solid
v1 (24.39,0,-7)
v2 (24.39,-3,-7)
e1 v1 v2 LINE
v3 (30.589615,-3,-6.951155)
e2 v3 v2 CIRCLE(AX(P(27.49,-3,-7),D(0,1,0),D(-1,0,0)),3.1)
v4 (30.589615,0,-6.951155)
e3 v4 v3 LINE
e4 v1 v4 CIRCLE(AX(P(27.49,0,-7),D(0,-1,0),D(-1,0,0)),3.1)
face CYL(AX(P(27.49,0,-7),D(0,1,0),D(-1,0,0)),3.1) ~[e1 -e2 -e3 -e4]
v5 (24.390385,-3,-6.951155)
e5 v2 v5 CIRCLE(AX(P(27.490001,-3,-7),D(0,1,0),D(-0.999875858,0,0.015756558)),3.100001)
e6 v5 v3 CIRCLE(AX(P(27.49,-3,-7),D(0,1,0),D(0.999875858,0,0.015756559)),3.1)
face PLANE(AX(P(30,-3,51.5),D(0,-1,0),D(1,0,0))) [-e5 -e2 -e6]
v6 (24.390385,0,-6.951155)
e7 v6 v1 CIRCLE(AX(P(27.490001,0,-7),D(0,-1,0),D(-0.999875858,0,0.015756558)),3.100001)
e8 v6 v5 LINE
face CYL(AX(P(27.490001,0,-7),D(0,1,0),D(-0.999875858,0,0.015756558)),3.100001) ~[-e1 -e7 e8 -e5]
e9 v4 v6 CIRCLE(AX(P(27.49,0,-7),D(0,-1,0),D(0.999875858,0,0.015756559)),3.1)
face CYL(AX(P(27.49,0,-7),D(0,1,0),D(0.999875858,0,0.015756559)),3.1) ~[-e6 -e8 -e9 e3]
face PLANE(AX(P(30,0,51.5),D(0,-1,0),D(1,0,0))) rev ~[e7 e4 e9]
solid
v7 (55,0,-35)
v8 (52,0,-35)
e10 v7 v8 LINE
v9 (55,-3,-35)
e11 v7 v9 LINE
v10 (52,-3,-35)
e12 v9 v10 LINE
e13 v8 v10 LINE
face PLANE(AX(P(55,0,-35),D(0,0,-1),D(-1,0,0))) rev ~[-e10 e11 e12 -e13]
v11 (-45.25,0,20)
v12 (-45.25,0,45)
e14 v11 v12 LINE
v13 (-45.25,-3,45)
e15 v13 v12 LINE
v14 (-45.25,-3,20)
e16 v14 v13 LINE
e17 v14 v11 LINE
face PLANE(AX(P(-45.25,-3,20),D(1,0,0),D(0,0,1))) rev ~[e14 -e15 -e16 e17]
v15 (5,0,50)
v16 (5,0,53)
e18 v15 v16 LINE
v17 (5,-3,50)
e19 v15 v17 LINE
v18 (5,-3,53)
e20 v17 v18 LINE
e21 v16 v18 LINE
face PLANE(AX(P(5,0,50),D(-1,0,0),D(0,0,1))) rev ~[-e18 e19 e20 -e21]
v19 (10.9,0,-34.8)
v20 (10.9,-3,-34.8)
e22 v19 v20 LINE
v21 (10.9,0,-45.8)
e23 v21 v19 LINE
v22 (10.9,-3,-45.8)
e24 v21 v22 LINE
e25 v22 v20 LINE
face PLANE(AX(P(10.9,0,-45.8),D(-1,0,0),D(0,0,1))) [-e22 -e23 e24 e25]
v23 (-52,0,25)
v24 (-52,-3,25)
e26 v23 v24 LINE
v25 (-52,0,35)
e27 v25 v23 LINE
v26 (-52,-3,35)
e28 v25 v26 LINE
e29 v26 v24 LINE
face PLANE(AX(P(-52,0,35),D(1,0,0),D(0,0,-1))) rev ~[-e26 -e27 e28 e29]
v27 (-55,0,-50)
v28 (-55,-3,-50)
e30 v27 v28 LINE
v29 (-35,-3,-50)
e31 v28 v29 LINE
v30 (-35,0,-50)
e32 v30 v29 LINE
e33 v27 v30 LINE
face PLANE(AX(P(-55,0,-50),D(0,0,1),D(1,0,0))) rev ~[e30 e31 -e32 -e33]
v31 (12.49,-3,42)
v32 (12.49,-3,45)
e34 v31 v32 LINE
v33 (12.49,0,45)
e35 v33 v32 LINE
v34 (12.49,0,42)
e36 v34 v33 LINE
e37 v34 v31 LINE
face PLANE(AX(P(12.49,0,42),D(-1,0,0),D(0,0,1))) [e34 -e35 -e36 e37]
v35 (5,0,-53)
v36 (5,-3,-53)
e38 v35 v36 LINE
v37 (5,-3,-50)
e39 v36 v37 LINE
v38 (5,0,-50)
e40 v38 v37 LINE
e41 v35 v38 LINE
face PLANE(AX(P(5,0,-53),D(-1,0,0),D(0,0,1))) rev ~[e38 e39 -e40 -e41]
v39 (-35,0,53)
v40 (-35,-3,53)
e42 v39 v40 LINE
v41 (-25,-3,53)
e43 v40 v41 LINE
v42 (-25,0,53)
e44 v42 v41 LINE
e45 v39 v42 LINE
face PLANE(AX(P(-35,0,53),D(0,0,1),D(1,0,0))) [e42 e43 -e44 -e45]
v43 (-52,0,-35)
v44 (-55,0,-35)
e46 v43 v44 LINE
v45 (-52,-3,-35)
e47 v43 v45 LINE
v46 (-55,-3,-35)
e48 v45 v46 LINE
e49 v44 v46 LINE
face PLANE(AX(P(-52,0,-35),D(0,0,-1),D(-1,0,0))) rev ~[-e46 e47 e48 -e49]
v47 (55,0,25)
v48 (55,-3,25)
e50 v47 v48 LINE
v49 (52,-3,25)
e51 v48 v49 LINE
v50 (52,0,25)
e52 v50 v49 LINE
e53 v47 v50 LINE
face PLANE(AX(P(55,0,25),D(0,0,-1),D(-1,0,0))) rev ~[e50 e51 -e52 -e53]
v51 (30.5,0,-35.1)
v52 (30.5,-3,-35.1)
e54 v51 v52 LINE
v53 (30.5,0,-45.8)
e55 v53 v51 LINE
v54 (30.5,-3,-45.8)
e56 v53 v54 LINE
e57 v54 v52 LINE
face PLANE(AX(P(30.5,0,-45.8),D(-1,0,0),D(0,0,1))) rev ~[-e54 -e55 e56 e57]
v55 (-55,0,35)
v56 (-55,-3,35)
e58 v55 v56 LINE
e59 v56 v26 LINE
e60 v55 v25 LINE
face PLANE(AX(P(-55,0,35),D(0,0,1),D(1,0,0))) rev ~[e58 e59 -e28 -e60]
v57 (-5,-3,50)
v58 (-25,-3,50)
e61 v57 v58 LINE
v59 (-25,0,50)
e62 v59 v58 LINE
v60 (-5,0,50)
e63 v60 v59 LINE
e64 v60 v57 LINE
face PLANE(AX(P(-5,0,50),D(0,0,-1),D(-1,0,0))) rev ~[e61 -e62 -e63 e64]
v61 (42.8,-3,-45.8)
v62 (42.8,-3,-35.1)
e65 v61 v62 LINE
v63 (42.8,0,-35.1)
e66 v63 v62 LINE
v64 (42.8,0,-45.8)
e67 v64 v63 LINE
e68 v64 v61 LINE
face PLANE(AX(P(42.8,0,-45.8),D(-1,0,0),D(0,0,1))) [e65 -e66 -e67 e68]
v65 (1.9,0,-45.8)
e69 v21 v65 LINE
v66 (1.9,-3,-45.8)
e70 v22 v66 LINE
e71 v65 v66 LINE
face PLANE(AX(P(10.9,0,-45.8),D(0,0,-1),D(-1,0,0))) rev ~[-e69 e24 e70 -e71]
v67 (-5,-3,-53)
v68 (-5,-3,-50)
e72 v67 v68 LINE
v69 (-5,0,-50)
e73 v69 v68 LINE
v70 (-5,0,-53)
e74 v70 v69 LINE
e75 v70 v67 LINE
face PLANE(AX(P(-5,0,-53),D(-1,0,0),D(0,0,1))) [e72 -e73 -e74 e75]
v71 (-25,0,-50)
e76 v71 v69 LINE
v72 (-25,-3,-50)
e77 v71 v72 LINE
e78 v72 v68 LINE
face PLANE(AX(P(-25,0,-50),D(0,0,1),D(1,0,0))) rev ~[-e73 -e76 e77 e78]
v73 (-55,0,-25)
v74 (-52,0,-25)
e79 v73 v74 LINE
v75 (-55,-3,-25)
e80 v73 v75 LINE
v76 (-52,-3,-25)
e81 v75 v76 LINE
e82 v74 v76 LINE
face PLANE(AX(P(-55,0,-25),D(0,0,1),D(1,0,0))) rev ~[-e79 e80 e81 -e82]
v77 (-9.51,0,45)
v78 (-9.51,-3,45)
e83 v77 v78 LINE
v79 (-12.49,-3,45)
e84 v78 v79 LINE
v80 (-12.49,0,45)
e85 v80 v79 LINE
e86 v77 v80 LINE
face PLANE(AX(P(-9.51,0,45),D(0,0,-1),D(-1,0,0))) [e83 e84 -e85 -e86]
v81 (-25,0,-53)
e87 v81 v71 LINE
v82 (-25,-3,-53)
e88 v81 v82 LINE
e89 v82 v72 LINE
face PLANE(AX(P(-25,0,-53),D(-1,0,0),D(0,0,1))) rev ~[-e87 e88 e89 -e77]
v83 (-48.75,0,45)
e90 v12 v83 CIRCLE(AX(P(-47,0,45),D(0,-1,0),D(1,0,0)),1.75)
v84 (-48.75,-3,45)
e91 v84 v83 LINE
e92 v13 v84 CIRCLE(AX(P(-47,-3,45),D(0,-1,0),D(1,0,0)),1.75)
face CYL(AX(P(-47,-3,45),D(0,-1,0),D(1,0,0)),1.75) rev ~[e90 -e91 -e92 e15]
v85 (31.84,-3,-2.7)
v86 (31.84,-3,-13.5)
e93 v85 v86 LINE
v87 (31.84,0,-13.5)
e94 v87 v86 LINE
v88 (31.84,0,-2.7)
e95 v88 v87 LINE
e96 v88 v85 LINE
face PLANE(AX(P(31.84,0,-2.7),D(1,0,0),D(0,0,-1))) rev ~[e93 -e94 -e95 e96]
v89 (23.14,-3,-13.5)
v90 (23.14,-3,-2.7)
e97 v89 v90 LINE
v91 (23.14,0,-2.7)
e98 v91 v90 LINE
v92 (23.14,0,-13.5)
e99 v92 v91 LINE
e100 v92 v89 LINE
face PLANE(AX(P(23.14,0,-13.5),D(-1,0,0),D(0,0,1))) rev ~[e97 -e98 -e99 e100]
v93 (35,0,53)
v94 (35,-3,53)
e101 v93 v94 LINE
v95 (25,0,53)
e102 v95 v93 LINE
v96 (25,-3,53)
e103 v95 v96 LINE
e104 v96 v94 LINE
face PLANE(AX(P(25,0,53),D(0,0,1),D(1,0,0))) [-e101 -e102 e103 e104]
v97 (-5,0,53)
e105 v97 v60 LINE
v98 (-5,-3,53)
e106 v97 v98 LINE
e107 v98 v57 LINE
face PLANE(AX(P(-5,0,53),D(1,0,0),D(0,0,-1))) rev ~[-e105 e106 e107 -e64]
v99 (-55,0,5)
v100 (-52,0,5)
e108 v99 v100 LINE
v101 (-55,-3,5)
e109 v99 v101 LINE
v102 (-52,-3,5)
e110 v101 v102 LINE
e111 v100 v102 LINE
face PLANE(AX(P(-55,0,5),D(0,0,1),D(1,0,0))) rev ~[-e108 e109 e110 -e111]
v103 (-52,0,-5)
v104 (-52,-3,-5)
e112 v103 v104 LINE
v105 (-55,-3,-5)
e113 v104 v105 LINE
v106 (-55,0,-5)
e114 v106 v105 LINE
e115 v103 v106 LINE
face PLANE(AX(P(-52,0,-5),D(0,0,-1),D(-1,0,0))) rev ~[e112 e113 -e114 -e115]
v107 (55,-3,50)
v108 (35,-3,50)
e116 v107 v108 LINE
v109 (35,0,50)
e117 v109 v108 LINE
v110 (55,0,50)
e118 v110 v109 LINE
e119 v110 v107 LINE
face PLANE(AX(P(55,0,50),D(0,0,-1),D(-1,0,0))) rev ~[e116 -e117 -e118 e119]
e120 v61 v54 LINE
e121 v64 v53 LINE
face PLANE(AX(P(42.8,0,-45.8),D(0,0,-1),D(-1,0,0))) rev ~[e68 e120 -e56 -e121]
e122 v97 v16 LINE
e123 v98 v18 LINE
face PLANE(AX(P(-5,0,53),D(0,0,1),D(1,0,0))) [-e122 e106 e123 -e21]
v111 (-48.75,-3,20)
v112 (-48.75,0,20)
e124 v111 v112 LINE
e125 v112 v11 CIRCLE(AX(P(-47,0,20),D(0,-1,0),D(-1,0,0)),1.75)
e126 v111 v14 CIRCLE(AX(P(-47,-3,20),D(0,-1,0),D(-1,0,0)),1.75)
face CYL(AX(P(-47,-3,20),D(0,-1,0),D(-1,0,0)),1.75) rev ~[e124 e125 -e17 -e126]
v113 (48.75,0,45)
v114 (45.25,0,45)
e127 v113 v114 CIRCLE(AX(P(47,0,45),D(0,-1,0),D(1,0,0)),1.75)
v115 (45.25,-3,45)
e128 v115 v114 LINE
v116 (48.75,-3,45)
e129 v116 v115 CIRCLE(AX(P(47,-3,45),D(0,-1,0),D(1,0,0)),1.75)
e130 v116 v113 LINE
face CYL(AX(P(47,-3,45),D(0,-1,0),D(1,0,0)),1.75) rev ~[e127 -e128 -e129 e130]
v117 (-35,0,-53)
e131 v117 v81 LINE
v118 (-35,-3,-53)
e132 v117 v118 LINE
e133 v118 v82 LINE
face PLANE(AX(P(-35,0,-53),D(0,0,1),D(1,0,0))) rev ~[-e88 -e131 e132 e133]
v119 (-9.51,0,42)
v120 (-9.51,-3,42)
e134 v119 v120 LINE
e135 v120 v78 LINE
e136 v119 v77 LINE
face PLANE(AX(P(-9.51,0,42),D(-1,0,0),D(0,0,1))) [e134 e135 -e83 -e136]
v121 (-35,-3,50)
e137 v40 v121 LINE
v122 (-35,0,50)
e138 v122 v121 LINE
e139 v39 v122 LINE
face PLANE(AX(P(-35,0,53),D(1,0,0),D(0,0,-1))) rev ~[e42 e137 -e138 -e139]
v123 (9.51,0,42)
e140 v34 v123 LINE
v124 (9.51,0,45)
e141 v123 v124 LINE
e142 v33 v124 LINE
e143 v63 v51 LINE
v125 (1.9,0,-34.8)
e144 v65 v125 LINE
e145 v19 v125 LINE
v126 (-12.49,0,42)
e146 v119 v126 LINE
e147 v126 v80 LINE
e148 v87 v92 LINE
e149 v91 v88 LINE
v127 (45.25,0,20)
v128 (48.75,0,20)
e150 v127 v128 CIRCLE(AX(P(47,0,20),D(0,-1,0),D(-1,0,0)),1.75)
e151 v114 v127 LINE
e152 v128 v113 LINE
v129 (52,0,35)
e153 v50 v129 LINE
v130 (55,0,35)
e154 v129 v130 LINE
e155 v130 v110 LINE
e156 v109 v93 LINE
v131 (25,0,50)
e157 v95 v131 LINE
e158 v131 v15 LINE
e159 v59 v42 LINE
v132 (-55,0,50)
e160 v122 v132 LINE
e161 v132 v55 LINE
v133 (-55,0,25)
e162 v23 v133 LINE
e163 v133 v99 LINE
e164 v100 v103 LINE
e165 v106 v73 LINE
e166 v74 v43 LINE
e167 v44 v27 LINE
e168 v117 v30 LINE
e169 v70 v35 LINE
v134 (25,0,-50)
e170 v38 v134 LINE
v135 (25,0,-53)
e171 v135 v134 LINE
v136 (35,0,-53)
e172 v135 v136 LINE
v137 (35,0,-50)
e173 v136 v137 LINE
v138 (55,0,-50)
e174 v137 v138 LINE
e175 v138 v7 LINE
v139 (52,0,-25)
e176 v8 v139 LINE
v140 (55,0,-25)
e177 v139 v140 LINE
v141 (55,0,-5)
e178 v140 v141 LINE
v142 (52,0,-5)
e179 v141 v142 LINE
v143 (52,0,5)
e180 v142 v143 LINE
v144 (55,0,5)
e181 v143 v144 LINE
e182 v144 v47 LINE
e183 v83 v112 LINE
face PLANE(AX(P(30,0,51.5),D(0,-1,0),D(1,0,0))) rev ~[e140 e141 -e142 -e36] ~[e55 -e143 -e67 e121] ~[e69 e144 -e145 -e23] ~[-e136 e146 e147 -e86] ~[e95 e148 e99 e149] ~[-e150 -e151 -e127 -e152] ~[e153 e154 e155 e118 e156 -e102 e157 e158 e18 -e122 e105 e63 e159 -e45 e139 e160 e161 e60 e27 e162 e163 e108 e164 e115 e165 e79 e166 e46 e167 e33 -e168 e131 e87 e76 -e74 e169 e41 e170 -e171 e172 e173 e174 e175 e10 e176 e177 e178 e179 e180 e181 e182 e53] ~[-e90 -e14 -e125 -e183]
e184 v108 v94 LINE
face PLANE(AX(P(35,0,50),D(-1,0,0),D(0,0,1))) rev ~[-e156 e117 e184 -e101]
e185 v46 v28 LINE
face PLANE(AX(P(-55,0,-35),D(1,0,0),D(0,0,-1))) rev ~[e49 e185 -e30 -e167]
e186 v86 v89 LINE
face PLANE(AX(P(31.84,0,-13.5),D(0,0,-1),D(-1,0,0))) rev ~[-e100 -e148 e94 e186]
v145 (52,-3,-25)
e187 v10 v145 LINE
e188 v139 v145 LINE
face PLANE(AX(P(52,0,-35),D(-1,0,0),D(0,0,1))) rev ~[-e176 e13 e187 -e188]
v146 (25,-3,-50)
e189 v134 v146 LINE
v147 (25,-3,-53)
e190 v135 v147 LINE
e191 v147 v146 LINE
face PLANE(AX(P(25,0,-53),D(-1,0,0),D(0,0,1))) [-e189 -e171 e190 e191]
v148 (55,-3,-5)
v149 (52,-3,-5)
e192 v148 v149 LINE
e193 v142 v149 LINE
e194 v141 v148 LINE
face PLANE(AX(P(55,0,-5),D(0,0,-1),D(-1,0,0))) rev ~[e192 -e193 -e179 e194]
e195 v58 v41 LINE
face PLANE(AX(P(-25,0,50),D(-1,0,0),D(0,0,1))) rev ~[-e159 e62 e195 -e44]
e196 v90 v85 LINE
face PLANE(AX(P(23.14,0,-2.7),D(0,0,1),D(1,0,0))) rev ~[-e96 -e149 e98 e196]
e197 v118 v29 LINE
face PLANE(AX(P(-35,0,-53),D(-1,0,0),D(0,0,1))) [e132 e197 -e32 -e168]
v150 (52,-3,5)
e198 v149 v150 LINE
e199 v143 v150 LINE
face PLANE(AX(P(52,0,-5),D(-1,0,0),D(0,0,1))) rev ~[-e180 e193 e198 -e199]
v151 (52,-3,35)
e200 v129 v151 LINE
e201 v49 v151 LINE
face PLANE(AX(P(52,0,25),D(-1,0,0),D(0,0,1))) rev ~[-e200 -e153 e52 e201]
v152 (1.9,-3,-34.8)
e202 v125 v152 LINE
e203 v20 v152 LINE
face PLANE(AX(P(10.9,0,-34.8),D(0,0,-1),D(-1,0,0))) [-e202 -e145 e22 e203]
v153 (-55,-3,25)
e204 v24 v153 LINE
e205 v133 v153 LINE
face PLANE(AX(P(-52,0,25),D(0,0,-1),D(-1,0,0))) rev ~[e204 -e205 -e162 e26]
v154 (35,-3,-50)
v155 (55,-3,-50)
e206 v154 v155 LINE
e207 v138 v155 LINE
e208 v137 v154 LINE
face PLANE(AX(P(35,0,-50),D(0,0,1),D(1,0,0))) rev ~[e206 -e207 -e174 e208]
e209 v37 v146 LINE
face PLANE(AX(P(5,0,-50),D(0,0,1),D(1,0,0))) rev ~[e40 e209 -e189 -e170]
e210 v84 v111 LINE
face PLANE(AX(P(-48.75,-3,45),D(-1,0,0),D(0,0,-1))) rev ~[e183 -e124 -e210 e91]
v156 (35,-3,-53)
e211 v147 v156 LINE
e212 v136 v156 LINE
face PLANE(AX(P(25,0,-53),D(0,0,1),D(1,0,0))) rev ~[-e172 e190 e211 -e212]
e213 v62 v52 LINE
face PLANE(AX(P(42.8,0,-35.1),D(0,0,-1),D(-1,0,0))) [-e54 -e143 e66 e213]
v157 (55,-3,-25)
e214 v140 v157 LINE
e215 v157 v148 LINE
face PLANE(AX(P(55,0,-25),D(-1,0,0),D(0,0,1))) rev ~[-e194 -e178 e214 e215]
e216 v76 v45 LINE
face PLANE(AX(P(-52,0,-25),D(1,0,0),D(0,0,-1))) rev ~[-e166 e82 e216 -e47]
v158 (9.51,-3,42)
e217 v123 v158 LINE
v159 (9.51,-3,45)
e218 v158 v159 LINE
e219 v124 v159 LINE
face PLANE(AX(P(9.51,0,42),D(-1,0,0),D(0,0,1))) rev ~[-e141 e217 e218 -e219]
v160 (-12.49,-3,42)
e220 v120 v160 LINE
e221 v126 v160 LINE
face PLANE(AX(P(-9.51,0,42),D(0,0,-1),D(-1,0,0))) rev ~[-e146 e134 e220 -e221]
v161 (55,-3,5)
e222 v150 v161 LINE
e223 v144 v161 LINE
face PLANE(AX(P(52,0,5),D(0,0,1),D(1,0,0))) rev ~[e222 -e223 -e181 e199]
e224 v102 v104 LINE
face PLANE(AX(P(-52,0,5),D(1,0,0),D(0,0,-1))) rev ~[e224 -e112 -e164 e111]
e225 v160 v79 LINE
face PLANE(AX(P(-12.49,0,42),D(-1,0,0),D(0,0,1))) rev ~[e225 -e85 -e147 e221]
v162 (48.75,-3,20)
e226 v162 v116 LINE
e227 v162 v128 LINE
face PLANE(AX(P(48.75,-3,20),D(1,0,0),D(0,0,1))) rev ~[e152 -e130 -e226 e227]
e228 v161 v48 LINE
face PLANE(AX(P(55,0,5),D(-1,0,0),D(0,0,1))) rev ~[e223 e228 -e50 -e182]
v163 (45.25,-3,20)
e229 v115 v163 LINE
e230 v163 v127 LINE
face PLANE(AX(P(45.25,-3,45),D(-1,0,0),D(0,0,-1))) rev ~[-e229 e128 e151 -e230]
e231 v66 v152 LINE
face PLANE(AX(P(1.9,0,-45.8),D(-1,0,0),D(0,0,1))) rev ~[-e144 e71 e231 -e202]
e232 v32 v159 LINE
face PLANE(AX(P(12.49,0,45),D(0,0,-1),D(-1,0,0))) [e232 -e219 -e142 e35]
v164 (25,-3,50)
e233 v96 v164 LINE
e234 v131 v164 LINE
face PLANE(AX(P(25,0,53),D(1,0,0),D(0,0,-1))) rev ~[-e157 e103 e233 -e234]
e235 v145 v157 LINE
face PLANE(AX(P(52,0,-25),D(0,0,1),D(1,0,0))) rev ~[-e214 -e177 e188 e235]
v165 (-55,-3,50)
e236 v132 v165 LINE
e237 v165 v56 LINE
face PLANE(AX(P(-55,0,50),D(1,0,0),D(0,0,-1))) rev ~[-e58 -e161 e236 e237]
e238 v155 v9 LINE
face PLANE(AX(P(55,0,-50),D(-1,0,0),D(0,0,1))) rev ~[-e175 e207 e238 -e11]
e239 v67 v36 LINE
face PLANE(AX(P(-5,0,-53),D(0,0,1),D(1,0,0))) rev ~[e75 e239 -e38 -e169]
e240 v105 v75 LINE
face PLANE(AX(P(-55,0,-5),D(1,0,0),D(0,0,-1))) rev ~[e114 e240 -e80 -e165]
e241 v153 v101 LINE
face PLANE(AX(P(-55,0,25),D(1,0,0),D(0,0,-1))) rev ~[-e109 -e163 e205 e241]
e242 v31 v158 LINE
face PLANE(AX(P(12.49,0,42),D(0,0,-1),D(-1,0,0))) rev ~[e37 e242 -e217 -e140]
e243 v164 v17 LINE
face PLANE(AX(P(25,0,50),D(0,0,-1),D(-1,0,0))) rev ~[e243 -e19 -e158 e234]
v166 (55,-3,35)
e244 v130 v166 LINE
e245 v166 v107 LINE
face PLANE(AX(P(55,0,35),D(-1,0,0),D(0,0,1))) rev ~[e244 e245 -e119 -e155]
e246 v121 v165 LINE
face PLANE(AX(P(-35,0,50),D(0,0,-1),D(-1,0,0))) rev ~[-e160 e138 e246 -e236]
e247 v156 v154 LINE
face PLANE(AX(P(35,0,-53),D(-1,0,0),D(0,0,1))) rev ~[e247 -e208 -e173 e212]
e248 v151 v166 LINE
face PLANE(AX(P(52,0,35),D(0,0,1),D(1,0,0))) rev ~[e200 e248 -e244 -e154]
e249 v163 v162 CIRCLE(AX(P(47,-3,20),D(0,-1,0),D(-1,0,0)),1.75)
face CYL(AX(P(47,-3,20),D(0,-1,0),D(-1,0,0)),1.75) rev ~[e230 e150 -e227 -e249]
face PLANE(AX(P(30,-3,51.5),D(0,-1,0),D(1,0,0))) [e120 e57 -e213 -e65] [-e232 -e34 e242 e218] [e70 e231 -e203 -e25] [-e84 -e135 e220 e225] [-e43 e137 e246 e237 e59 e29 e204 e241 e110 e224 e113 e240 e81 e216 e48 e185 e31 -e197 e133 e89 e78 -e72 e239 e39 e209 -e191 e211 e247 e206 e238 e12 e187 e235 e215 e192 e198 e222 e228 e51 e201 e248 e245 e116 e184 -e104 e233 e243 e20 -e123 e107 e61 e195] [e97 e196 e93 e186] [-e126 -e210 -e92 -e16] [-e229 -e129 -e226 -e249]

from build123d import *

# Parameters (mm, degrees)
F0_W     = 10
F0_H     = 3
F1_DEPTH = 3
F2_W     = 2.98
F2_H     = 3
F2_W_2   = 12.3
F2_H_2   = 10.7
F2_W_3   = 9
F2_H_3   = 11
F2_W_4   = 8.7
F2_H_4   = 2.2
F3_DEPTH = 25
F5_DEPTH = 25


# Not quite as in the source:
# - a feature names something its author has since deleted; it is built from what else it names


with BuildPart() as f1:
    # F0 (on Front) → F1 (new body)
    with BuildSketch(Plane.XZ):
        with Locations((30, 51.5)):
            Rectangle(F0_W, F0_H)
        with Locations((0, 51.5)):
            Rectangle(F0_W, F0_H)
        with Locations((-30, 51.5)):
            Rectangle(F0_W, F0_H)
        with Locations((30, 48.5)):
            Rectangle(F0_W, F0_H)
        with Locations((0, 48.5)):
            Rectangle(F0_W, F0_H)
        with Locations((-30, 48.5)):
            Rectangle(F0_W, F0_H)
        Polygon((55, 35), (55, 50), (35, 50), (35, 47), (25, 47), (25, 50), (5, 50), (5, 47), (-5, 47), (-5, 50), (-25, 50), (-25, 47), (-35, 47), (-35, 50), (-55, 50), (-55, 35), (-52, 35), (-52, 25), (-55, 25), (-55, 5), (-52, 5), (-52, -5), (-55, -5), (-55, -25), (-52, -25), (-52, -35), (-55, -35), (-55, -50), (-35, -50), (-35, -47), (-25, -47), (-25, -50), (-5, -50), (-5, -47), (5, -47), (5, -50), (25, -50), (25, -47), (35, -47), (35, -50), (55, -50), (55, -35), (52, -35), (52, -25), (55, -25), (55, -5), (52, -5), (52, 5), (55, 5), (55, 25), (52, 25), (52, 35), align=None)
        with Locations((30, -51.5)):
            Rectangle(F0_W, F0_H)
        with Locations((30, -48.5)):
            Rectangle(F0_W, F0_H)
        with Locations((0, -48.5)):
            Rectangle(F0_W, F0_H)
        with Locations((0, -51.5)):
            Rectangle(F0_W, F0_H)
        with Locations((-30, -48.5)):
            Rectangle(F0_W, F0_H)
        with Locations((-30, -51.5)):
            Rectangle(F0_W, F0_H)
    extrude(amount=F1_DEPTH)

    # F2 (on face) + F1_face1 (on face) → F3 (cut)
    with BuildSketch(Plane(origin=(0, 0, 0), x_dir=(-1, 0, 0), z_dir=(0, 1, 0))):
        with Locations((-11, 43.5)):
            Rectangle(F2_W, F2_H)
        with Locations((-36.65, -40.45)):
            Rectangle(F2_W_2, F2_H_2)
        with Locations((-6.4, -40.3)):
            Rectangle(F2_W_3, F2_H_3)
        with Locations((11, 43.5)):
            Rectangle(F2_W, F2_H)
        with BuildLine():
            ThreePointArc((-24.3903848411, -6.9511546684), (-24.3900962118, -6.9755765762), (-24.39, -7))
            ThreePointArc((-24.39, -7), (-27.5144234238, -10.0999037882), (-30.5896151589, -6.9511546684))
            Line((-30.5896151589, -6.9511546684), (-31.84, -6.9511546684))
            Line((-31.84, -6.9511546684), (-31.84, -11.3))
            Line((-31.84, -11.3), (-23.14, -11.3))
            Line((-23.14, -11.3), (-23.14, -6.9511546684))
            Line((-23.14, -6.9511546684), (-24.3903848411, -6.9511546684))
        make_face()
        with BuildLine():
            ThreePointArc((-30.5896151589, -6.9511546684), (-27.49, -3.9), (-24.3903848411, -6.9511546684))
            Line((-24.3903848411, -6.9511546684), (-23.14, -6.9511546684))
            Line((-23.14, -6.9511546684), (-23.14, -2.7))
            Line((-23.14, -2.7), (-31.84, -2.7))
            Line((-31.84, -2.7), (-31.84, -6.9511546684))
            Line((-31.84, -6.9511546684), (-30.5896151589, -6.9511546684))
        make_face()
        with Locations((-27.49, -12.4)):
            Rectangle(F2_W_4, F2_H_4)
    with BuildSketch(Plane.XZ.offset(3)):
        Polygon((35, 53), (25, 53), (25, 50), (5, 50), (5, 53), (-5, 53), (-5, 50), (-25, 50), (-25, 53), (-35, 53), (-35, 50), (-55, 50), (-55, 35), (-52, 35), (-52, 25), (-55, 25), (-55, 5), (-52, 5), (-52, -5), (-55, -5), (-55, -25), (-52, -25), (-52, -35), (-55, -35), (-55, -50), (-35, -50), (-35, -53), (-25, -53), (-25, -50), (-5, -50), (-5, -53), (5, -53), (5, -50), (25, -50), (25, -53), (35, -53), (35, -50), (55, -50), (55, -35), (52, -35), (52, -25), (55, -25), (55, -5), (52, -5), (52, 5), (55, 5), (55, 25), (52, 25), (52, 35), (55, 35), (55, 50), (35, 50), align=None)
    extrude(amount=-F3_DEPTH, dir=(0, 1, 0), mode=Mode.SUBTRACT)

    # F4 (on face) → F5 (cut)
    with BuildSketch(Plane.XZ.offset(3)):
        with BuildLine():
            ThreePointArc((-45.25, 45), (-47, 46.75), (-48.75, 45))
            Line((-48.75, 45), (-48.75, 20))
            ThreePointArc((-48.75, 20), (-47, 18.25), (-45.25, 20))
            Line((-45.25, 20), (-45.25, 45))
        make_face()
        with BuildLine():
            ThreePointArc((48.75, 45), (47, 46.75), (45.25, 45))
            Line((45.25, 45), (45.25, 20))
            ThreePointArc((45.25, 20), (47, 18.25), (48.75, 20))
            Line((48.75, 20), (48.75, 45))
        make_face()
    extrude(amount=-F5_DEPTH, mode=Mode.SUBTRACT)


solid = f1.part
